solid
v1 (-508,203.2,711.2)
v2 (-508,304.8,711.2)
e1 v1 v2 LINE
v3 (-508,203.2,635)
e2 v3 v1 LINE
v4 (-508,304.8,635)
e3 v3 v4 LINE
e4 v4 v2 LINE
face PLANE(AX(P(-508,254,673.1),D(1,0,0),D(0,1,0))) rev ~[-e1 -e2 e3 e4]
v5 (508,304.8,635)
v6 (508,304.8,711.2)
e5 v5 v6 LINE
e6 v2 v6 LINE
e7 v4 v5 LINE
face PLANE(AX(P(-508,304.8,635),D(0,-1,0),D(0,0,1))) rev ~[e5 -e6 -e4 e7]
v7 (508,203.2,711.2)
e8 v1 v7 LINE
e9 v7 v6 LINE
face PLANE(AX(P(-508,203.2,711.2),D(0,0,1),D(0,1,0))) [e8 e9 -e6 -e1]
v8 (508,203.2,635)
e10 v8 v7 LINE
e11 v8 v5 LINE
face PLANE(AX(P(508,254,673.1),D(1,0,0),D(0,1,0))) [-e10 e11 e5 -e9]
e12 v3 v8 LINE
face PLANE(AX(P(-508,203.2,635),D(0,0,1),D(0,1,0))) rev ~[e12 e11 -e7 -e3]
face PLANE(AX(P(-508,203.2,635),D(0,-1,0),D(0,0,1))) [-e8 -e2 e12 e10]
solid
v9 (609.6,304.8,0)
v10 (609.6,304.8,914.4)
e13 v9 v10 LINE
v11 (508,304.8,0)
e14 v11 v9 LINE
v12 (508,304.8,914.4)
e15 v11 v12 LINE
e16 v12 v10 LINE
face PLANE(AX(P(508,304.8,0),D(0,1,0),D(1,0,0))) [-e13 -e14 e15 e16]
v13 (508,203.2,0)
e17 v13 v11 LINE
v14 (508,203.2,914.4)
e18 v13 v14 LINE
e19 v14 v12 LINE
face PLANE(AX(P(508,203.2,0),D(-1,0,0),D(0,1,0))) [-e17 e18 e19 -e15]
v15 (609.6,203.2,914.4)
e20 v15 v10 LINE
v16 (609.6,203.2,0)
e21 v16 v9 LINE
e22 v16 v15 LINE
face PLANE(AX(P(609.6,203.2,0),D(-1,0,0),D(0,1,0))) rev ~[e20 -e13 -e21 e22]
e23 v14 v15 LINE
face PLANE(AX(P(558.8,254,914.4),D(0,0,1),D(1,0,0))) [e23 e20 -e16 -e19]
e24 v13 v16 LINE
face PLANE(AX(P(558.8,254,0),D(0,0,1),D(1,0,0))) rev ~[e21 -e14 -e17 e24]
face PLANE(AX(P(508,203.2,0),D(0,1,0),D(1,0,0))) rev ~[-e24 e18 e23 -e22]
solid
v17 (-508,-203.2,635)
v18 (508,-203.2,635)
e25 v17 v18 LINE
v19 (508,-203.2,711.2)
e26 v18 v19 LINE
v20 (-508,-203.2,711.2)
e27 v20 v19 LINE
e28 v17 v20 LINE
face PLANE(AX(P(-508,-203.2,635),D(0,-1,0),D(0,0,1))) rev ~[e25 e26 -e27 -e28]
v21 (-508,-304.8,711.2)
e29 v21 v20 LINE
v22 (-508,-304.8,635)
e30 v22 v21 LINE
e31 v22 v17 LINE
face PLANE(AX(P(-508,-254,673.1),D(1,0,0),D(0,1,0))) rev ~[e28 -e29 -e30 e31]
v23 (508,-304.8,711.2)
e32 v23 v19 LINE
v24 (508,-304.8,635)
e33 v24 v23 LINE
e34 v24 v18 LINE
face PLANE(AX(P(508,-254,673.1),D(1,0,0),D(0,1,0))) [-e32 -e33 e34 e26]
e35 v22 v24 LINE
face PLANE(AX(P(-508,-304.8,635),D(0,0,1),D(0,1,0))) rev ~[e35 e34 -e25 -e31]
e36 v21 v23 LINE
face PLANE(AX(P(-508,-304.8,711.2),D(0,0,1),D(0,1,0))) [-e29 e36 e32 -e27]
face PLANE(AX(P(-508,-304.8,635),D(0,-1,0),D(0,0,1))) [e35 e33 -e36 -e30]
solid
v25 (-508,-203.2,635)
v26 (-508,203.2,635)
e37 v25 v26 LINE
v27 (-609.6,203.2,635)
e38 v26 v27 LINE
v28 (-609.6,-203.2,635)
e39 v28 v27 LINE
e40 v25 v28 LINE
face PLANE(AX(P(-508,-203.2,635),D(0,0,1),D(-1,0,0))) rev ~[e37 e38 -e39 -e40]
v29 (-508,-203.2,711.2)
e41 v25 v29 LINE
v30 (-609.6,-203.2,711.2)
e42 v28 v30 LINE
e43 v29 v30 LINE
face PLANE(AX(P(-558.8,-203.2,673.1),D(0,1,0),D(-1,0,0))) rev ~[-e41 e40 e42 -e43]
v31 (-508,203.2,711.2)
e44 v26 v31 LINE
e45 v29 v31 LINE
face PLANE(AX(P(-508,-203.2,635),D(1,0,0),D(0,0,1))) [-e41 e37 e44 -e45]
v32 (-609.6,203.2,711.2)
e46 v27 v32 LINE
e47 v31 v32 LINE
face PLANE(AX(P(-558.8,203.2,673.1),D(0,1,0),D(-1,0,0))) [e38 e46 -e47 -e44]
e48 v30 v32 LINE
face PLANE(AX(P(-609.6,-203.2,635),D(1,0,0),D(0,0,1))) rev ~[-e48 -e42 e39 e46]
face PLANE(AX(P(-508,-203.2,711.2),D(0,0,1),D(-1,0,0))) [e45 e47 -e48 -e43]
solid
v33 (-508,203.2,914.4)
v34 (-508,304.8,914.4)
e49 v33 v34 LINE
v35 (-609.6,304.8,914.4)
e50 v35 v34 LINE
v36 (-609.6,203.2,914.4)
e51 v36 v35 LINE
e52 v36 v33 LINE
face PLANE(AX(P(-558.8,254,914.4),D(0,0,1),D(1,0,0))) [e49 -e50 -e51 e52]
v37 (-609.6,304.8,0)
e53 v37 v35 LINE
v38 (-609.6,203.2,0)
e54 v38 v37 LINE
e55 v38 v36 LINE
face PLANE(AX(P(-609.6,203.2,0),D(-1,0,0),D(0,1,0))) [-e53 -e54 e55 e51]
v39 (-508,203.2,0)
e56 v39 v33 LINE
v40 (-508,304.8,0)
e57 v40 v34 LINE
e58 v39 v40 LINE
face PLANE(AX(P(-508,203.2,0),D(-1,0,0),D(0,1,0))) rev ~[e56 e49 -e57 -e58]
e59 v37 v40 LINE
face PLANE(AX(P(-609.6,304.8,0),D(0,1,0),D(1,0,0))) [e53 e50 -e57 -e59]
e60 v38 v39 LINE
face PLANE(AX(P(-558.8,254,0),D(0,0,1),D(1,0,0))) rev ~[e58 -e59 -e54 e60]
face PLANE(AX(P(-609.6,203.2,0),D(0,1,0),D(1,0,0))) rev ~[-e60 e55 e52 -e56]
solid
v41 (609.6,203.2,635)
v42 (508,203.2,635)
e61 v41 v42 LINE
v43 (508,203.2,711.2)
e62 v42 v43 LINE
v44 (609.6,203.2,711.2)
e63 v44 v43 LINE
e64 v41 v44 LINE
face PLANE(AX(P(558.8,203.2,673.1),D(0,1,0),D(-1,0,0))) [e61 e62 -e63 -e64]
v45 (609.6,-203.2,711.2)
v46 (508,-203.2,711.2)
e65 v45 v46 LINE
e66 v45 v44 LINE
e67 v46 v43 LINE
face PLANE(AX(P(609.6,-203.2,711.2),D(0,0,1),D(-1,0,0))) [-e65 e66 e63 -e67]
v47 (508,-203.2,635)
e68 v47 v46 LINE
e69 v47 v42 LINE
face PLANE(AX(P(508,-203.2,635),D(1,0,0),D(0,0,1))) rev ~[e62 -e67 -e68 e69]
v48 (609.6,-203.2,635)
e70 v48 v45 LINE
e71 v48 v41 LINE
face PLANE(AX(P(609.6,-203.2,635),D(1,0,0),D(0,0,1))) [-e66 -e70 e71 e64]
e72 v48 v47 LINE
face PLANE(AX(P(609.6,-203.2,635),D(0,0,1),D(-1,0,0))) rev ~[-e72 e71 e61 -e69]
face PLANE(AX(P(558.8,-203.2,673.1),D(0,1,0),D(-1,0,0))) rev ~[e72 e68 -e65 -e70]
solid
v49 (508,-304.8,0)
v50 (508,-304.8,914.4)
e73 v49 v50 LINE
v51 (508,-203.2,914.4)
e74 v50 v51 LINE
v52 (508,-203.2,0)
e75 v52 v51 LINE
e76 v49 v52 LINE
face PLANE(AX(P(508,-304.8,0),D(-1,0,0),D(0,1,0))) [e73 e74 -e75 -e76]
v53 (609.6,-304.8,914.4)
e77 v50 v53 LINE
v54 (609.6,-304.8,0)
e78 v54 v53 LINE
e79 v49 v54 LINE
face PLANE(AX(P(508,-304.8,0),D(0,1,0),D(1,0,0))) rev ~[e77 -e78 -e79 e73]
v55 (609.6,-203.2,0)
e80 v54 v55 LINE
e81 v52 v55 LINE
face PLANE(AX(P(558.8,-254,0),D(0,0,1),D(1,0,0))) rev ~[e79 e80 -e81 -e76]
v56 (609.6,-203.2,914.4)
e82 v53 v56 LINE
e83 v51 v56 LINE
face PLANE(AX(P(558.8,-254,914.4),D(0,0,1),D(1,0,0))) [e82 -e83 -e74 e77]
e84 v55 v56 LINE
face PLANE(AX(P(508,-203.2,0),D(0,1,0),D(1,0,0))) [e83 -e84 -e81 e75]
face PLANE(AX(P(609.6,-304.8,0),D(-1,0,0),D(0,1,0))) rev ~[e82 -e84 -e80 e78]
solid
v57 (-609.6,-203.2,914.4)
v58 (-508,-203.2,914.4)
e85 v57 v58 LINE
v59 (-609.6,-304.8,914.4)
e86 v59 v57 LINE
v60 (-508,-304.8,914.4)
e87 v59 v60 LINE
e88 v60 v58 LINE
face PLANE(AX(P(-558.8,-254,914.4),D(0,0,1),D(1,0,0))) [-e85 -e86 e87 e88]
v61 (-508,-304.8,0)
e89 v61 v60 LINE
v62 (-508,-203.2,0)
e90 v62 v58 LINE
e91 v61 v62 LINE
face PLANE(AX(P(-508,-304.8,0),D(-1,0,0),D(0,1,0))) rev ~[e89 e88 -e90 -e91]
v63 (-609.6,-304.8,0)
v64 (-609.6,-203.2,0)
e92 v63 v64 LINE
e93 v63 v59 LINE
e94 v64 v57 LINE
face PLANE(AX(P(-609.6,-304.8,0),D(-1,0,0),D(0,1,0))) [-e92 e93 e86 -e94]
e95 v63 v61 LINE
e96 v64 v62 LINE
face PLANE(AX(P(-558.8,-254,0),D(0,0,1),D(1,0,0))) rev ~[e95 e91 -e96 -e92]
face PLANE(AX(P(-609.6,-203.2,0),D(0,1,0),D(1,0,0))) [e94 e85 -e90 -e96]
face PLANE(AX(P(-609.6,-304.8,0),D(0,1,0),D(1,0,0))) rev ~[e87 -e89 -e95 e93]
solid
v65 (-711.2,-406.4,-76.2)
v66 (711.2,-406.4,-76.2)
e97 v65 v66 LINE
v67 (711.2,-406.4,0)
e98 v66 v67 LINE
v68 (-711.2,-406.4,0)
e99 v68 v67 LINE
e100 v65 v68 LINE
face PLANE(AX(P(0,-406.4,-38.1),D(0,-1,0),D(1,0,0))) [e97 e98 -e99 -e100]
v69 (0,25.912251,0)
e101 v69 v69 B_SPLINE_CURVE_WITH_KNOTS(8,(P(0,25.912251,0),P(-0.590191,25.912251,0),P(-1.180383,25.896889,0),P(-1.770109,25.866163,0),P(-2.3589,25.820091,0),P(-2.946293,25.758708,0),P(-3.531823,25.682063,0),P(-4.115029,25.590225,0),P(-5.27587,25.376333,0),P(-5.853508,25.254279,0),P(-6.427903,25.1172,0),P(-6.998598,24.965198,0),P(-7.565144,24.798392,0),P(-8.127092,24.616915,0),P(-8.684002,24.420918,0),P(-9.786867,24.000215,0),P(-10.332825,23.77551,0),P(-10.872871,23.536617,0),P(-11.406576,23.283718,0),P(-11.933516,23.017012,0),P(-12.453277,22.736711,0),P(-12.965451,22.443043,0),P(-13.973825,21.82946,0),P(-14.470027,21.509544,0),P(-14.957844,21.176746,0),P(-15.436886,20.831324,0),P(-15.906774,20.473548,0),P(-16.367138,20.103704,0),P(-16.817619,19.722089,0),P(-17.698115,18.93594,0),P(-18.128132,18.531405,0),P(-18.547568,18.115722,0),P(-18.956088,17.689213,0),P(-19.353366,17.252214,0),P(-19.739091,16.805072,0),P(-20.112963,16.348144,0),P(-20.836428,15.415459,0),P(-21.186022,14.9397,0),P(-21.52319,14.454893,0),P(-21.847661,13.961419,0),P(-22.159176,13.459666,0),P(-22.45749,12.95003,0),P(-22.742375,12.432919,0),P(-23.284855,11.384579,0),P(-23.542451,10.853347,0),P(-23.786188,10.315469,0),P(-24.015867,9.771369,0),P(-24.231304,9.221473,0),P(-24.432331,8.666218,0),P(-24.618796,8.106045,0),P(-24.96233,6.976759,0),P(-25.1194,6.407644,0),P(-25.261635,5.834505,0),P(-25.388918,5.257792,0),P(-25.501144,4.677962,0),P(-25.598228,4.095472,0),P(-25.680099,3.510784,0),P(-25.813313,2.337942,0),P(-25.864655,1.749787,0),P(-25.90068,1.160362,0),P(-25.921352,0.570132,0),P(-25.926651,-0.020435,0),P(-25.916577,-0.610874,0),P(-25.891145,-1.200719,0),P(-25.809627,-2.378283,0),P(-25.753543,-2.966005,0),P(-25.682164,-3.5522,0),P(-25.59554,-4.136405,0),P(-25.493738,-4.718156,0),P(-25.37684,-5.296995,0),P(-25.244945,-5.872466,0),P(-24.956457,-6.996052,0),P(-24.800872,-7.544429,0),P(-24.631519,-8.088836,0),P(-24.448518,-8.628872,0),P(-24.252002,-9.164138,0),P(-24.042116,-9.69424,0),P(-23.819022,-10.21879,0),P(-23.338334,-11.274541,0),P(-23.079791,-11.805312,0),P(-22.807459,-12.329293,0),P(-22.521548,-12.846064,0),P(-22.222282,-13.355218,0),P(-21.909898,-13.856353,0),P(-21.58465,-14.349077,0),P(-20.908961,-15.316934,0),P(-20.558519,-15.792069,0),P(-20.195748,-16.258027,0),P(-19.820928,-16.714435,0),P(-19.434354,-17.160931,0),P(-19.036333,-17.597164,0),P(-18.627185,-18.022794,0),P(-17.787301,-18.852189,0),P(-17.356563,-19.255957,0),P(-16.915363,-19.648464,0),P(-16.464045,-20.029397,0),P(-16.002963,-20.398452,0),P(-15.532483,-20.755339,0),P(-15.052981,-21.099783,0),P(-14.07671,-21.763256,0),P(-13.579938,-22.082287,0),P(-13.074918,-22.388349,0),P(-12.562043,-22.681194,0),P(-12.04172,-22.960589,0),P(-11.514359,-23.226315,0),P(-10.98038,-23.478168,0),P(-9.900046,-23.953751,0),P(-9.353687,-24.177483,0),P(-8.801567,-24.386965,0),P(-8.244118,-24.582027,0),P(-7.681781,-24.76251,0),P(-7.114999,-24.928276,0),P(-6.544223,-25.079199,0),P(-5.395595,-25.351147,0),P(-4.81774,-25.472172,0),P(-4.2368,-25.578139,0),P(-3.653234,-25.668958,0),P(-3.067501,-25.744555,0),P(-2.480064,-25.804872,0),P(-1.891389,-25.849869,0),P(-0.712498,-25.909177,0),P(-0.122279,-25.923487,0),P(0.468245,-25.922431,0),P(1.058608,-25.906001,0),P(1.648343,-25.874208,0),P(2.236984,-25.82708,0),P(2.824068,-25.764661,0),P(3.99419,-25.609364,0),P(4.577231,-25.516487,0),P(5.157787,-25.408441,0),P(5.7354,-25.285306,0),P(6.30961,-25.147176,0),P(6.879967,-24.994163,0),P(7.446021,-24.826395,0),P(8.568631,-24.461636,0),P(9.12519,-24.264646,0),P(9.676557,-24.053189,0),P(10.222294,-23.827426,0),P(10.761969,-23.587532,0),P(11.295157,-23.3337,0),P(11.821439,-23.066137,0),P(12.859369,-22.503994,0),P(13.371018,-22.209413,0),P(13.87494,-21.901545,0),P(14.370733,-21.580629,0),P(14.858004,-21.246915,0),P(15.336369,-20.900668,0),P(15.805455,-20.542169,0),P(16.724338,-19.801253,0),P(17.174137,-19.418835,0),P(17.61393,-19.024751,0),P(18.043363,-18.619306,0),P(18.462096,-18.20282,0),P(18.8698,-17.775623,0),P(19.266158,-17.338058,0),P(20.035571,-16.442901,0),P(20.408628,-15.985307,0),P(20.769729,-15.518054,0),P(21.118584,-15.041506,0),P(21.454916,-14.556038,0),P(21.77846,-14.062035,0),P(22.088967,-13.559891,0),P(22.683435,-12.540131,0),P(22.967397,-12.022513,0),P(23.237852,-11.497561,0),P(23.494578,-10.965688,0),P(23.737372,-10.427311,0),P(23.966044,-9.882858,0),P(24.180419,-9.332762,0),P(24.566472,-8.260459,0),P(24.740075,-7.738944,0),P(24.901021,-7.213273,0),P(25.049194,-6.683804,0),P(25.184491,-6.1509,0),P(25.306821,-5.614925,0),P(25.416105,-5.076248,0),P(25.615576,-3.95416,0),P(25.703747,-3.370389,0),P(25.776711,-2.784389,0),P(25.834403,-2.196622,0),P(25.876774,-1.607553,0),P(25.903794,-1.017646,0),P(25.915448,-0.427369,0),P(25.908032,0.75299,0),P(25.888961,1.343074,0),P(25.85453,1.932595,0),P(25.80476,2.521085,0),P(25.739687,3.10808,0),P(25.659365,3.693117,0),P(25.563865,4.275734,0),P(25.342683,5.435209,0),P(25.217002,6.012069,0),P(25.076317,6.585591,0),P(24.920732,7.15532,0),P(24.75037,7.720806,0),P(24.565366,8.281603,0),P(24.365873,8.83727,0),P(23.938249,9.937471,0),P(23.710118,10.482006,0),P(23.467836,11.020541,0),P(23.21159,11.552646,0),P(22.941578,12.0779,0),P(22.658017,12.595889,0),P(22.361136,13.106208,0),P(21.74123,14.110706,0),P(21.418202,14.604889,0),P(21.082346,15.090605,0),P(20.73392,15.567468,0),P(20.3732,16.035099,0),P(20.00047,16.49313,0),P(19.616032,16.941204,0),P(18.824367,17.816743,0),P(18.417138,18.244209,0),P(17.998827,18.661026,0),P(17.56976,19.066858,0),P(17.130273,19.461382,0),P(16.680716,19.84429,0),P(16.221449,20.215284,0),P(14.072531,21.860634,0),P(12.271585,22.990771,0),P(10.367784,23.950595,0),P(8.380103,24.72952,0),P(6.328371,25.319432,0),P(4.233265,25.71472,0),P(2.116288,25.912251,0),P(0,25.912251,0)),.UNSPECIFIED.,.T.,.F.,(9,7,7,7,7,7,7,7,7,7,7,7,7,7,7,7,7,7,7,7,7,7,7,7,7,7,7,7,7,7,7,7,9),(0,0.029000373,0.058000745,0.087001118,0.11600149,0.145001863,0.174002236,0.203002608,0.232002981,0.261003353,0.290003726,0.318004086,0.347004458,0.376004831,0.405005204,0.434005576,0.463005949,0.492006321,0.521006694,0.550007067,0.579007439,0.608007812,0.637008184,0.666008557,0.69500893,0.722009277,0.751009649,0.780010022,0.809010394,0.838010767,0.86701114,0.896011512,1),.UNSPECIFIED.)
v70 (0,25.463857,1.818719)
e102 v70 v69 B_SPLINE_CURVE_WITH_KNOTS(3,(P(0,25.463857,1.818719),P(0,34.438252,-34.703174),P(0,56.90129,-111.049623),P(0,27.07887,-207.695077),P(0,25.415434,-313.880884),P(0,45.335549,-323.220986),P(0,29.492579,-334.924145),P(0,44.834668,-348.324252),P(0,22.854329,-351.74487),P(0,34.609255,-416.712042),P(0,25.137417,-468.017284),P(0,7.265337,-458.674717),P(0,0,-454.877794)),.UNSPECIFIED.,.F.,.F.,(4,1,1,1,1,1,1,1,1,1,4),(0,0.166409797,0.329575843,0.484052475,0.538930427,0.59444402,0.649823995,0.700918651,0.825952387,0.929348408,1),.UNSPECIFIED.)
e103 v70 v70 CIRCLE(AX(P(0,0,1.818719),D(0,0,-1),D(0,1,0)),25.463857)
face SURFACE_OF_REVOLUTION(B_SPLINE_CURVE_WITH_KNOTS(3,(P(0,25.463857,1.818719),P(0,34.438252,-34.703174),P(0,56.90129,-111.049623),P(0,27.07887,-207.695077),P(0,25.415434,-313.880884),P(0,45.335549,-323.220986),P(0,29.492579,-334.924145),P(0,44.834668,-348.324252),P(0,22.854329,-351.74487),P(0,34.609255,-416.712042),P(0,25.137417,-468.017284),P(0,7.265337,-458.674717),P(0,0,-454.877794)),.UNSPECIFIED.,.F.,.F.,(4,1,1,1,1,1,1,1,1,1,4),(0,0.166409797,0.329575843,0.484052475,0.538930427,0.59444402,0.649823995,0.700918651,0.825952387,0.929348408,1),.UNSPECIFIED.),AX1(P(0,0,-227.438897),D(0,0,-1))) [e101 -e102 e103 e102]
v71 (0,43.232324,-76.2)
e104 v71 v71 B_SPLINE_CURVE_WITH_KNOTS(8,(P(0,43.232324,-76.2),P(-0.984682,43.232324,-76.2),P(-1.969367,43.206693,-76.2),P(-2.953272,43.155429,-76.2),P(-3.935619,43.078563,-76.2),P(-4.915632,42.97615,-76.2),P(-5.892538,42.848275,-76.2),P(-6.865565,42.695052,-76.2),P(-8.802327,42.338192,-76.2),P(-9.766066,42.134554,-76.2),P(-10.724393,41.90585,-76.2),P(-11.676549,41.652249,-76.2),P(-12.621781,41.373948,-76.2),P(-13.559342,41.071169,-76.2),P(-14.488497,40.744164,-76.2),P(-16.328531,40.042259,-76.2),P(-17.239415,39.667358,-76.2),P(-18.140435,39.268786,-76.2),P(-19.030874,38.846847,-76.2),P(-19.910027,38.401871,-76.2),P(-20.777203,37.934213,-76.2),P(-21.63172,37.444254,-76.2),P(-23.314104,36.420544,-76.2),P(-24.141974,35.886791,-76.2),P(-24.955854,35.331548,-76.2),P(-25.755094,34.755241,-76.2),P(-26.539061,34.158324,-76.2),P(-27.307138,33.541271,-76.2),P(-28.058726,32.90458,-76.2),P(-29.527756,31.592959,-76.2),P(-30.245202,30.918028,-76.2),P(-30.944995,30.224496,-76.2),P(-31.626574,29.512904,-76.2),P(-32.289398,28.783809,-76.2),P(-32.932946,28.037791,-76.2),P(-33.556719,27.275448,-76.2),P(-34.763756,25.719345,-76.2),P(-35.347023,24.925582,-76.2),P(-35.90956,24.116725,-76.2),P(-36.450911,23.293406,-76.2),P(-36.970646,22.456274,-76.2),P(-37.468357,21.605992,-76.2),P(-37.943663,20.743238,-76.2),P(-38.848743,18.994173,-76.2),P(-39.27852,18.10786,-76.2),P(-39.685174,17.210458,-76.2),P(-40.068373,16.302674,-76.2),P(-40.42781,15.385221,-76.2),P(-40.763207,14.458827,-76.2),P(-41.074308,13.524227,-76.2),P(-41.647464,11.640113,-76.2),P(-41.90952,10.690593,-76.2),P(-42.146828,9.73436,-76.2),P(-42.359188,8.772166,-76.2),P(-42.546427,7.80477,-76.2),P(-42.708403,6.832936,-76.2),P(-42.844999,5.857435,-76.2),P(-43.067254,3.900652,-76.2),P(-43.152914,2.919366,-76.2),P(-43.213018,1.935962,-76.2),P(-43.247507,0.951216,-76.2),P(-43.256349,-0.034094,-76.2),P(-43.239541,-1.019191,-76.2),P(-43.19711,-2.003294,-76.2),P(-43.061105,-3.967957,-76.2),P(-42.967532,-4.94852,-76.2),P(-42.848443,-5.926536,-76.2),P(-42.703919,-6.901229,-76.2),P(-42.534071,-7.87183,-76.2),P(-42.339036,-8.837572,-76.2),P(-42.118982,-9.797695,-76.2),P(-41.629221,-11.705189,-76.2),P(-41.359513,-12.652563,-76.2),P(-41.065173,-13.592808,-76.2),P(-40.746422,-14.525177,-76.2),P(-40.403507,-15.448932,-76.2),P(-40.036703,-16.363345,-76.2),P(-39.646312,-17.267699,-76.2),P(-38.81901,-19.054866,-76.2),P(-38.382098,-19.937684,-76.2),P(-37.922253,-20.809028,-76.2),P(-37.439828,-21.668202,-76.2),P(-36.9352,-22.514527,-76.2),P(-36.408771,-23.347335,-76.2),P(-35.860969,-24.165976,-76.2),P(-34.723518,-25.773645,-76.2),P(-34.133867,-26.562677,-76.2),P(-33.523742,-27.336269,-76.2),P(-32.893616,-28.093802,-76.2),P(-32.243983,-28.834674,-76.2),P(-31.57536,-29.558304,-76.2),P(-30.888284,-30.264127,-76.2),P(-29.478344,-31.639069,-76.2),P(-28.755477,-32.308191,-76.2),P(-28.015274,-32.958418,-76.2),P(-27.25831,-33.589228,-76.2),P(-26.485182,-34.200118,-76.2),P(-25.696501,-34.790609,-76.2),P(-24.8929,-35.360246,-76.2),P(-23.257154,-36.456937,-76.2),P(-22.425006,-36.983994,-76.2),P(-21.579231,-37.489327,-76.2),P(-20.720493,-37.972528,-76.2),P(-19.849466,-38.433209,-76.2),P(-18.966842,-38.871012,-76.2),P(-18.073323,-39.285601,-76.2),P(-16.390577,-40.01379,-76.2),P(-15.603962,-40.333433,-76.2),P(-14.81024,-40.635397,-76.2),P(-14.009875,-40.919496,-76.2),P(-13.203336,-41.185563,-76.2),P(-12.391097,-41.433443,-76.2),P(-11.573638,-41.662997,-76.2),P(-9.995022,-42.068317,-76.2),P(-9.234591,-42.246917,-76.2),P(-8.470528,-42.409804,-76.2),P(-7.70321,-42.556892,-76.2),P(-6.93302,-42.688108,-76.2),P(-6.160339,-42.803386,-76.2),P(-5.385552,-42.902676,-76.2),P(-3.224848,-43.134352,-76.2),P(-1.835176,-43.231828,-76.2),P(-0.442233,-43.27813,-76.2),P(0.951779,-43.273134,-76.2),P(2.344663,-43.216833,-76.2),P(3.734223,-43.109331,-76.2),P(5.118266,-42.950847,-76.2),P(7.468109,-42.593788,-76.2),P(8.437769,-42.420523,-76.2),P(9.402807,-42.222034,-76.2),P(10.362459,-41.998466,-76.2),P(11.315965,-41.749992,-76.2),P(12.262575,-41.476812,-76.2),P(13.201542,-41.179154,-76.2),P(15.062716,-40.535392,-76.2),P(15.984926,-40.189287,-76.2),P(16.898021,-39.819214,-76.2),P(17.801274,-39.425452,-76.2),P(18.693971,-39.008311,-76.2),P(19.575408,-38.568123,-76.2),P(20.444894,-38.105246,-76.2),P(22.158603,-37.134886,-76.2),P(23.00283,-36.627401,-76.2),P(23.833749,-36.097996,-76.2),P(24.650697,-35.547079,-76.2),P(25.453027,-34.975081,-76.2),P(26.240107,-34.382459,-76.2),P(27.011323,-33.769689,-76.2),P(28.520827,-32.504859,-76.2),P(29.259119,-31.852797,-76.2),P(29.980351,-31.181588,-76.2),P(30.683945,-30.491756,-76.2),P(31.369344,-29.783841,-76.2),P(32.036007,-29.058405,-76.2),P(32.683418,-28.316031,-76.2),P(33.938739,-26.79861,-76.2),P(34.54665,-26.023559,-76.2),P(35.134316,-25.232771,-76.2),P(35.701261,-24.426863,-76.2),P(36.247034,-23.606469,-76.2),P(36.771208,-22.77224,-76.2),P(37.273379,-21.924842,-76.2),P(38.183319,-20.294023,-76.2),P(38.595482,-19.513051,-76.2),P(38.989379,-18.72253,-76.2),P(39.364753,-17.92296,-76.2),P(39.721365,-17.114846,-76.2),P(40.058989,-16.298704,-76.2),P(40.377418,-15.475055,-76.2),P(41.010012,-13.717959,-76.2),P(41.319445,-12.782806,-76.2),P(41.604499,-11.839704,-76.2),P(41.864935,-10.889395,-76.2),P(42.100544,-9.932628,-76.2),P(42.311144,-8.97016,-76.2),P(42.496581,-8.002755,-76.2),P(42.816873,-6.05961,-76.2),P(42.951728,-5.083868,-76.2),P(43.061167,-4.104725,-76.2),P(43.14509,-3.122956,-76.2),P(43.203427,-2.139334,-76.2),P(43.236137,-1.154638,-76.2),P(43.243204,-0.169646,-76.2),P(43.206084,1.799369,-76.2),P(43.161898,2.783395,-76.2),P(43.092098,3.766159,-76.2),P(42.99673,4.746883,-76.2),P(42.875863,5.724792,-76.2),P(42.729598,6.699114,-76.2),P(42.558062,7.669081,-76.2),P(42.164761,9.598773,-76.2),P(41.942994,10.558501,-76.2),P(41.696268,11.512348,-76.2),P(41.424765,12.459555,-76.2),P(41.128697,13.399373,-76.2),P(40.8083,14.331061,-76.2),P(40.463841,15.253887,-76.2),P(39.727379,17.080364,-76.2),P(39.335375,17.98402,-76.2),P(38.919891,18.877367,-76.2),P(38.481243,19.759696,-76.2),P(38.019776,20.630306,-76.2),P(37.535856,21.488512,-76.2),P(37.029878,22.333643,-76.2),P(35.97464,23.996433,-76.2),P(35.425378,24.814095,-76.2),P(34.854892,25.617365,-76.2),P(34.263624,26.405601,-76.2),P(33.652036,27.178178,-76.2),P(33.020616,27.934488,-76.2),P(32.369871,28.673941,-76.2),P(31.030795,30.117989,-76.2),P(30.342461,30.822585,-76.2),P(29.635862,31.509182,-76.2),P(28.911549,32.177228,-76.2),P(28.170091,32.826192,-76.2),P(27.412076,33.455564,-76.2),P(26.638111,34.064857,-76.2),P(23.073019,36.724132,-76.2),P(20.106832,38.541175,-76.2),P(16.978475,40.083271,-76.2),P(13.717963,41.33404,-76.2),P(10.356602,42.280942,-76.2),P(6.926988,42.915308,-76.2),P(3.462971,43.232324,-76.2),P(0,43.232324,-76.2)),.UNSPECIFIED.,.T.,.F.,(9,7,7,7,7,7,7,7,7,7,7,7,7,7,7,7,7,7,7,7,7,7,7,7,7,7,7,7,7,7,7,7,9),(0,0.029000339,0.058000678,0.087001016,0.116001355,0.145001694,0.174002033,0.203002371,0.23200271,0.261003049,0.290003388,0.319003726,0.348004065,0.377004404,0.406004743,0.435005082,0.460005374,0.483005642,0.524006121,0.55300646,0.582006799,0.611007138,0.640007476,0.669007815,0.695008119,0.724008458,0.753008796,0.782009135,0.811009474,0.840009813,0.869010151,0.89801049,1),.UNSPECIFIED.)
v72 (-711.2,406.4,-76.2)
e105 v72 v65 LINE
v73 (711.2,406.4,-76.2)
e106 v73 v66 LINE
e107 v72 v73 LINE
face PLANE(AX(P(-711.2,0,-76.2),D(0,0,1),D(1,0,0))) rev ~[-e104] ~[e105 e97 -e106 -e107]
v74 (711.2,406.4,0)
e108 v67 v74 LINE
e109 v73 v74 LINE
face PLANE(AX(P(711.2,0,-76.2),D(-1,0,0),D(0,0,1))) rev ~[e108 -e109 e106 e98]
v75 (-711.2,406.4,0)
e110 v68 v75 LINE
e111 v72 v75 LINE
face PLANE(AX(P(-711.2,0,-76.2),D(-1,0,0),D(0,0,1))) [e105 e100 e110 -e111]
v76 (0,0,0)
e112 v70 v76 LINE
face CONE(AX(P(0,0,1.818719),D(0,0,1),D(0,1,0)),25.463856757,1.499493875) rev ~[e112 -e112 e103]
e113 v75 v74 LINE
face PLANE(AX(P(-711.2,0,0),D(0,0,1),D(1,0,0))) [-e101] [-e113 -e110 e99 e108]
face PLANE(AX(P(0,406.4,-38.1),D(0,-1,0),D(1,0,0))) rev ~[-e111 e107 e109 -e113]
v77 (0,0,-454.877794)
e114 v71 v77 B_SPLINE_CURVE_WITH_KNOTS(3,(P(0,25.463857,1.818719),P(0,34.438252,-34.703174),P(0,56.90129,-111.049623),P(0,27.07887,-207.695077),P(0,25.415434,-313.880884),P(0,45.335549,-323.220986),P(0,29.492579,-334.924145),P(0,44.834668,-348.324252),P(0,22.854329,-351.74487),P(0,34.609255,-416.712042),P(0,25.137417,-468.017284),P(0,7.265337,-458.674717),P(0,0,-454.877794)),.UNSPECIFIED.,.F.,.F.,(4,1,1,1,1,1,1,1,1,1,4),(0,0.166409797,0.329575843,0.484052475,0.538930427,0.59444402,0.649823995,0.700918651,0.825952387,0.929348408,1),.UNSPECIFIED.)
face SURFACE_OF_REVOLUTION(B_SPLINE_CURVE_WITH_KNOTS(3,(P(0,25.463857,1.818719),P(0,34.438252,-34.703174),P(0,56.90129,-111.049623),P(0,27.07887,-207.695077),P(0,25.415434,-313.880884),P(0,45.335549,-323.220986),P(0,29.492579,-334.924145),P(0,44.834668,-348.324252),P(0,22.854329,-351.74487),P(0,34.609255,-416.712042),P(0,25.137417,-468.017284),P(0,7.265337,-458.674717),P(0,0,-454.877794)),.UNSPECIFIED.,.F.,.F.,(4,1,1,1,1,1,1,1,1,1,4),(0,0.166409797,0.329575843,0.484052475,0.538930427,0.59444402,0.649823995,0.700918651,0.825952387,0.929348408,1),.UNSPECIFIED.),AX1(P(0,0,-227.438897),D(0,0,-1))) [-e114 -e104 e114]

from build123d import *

# Parameters (mm, degrees)
F0_W          = 101.6
F0_H          = 101.6
F1_DEPTH      = 914.4
F2_W          = 101.6
F2_H          = 76.2
F3_DEPTH      = 1016
F4_W          = 101.6
F4_H          = 76.2
F5_DEPTH      = 406.4
F6_W          = 1422.4
F6_H          = 76.2
F7_DEPTH      = 406.4
F7_DEPTH_BACK = 406.4


with BuildPart() as f1:
    # F0 (on Top) → F1 (new body)
    with BuildSketch(Plane.XY):
        with Locations((-558.8, 254)):
            Rectangle(F0_W, F0_H)
    extrude(amount=F1_DEPTH)


with BuildPart() as f1b:
    # F0 (on Top) → F1, piece 2 (new body)
    with BuildSketch(Plane.XY):
        with Locations((-558.8, -254)):
            Rectangle(F0_W, F0_H)
    extrude(amount=F1_DEPTH)


with BuildPart() as f1c:
    # F0 (on Top) → F1, piece 3 (new body)
    with BuildSketch(Plane.XY):
        with Locations((558.8, 254)):
            Rectangle(F0_W, F0_H)
    extrude(amount=F1_DEPTH)


with BuildPart() as f1d:
    # F0 (on Top) → F1, piece 4 (new body)
    with BuildSketch(Plane.XY):
        with Locations((558.8, -254)):
            Rectangle(F0_W, F0_H)
    extrude(amount=F1_DEPTH)


with BuildPart() as f3:
    # F2 (on face) → F3 (new body)
    with BuildSketch(Plane.YZ.offset(-508)):
        with Locations((-254, 673.1)):
            Rectangle(F2_W, F2_H)
    extrude(amount=F3_DEPTH)


with BuildPart() as f3b:
    # F2 (on face) → F3, piece 2 (new body)
    with BuildSketch(Plane.YZ.offset(-508)):
        with Locations((254, 673.1)):
            Rectangle(F2_W, F2_H)
    extrude(amount=F3_DEPTH)


with BuildPart() as f5:
    # F4 (on face) → F5 (new body)
    with BuildSketch(Plane(origin=(0, -203.2, 0), x_dir=(-1, 0, 0), z_dir=(0, 1, 0))):
        with Locations((-558.8, 673.1)):
            Rectangle(F4_W, F4_H)
    extrude(amount=F5_DEPTH)


with BuildPart() as f5b:
    # F4 (on face) → F5, piece 2 (new body)
    with BuildSketch(Plane(origin=(0, -203.2, 0), x_dir=(-1, 0, 0), z_dir=(0, 1, 0))):
        with Locations((558.8, 673.1)):
            Rectangle(F4_W, F4_H)
    extrude(amount=F5_DEPTH)


with BuildPart() as f7:
    # F6 (on Front) → F7 (new body, two sides)
    with BuildSketch(Plane.XZ) as f7_sk:
        with Locations((0, -38.1)):
            Rectangle(F6_W, F6_H)
    extrude(amount=-F7_DEPTH)
    extrude(f7_sk.sketch, amount=F7_DEPTH_BACK)

    # F8 (on Right) → F9 (revolve)
    with BuildSketch(Plane.YZ):
        with BuildLine():
            Line((25.4638567567, 1.8187186215), (0, 0))
            Line((0, 0), (0, -454.8777937889))
            add(Edge.make_bspline(
                [(25.4638567567, 1.8187186215), (34.4382523346, -34.7031738143), (56.9012899023, -111.0496230705), (27.0788695893, -207.6950770004), (25.4154335933, -313.8808837767), (45.3355488252, -323.2209863813), (29.4925793524, -334.9241454751), (44.8346681145, -348.3242520498), (22.854328945, -351.7448701182), (34.6092554991, -416.712042373), (25.1374166029, -468.0172844227), (7.2653372186, -458.674717409), (0, -454.8777937889)],
                knots=[0, 0, 0, 0, 0.1664097973, 0.3295758434, 0.484052475, 0.538930427, 0.5944440202, 0.6498239949, 0.7009186508, 0.8259523875, 0.9293484076, 1, 1, 1, 1], degree=3))
        make_face()
    revolve(axis=Axis((0, 0, -227.4388968945), (0, 0, -1)))


solid = Compound([f1.part, f1b.part, f1c.part, f1d.part, f3.part, f3b.part, f5.part, f5b.part, f7.part])
